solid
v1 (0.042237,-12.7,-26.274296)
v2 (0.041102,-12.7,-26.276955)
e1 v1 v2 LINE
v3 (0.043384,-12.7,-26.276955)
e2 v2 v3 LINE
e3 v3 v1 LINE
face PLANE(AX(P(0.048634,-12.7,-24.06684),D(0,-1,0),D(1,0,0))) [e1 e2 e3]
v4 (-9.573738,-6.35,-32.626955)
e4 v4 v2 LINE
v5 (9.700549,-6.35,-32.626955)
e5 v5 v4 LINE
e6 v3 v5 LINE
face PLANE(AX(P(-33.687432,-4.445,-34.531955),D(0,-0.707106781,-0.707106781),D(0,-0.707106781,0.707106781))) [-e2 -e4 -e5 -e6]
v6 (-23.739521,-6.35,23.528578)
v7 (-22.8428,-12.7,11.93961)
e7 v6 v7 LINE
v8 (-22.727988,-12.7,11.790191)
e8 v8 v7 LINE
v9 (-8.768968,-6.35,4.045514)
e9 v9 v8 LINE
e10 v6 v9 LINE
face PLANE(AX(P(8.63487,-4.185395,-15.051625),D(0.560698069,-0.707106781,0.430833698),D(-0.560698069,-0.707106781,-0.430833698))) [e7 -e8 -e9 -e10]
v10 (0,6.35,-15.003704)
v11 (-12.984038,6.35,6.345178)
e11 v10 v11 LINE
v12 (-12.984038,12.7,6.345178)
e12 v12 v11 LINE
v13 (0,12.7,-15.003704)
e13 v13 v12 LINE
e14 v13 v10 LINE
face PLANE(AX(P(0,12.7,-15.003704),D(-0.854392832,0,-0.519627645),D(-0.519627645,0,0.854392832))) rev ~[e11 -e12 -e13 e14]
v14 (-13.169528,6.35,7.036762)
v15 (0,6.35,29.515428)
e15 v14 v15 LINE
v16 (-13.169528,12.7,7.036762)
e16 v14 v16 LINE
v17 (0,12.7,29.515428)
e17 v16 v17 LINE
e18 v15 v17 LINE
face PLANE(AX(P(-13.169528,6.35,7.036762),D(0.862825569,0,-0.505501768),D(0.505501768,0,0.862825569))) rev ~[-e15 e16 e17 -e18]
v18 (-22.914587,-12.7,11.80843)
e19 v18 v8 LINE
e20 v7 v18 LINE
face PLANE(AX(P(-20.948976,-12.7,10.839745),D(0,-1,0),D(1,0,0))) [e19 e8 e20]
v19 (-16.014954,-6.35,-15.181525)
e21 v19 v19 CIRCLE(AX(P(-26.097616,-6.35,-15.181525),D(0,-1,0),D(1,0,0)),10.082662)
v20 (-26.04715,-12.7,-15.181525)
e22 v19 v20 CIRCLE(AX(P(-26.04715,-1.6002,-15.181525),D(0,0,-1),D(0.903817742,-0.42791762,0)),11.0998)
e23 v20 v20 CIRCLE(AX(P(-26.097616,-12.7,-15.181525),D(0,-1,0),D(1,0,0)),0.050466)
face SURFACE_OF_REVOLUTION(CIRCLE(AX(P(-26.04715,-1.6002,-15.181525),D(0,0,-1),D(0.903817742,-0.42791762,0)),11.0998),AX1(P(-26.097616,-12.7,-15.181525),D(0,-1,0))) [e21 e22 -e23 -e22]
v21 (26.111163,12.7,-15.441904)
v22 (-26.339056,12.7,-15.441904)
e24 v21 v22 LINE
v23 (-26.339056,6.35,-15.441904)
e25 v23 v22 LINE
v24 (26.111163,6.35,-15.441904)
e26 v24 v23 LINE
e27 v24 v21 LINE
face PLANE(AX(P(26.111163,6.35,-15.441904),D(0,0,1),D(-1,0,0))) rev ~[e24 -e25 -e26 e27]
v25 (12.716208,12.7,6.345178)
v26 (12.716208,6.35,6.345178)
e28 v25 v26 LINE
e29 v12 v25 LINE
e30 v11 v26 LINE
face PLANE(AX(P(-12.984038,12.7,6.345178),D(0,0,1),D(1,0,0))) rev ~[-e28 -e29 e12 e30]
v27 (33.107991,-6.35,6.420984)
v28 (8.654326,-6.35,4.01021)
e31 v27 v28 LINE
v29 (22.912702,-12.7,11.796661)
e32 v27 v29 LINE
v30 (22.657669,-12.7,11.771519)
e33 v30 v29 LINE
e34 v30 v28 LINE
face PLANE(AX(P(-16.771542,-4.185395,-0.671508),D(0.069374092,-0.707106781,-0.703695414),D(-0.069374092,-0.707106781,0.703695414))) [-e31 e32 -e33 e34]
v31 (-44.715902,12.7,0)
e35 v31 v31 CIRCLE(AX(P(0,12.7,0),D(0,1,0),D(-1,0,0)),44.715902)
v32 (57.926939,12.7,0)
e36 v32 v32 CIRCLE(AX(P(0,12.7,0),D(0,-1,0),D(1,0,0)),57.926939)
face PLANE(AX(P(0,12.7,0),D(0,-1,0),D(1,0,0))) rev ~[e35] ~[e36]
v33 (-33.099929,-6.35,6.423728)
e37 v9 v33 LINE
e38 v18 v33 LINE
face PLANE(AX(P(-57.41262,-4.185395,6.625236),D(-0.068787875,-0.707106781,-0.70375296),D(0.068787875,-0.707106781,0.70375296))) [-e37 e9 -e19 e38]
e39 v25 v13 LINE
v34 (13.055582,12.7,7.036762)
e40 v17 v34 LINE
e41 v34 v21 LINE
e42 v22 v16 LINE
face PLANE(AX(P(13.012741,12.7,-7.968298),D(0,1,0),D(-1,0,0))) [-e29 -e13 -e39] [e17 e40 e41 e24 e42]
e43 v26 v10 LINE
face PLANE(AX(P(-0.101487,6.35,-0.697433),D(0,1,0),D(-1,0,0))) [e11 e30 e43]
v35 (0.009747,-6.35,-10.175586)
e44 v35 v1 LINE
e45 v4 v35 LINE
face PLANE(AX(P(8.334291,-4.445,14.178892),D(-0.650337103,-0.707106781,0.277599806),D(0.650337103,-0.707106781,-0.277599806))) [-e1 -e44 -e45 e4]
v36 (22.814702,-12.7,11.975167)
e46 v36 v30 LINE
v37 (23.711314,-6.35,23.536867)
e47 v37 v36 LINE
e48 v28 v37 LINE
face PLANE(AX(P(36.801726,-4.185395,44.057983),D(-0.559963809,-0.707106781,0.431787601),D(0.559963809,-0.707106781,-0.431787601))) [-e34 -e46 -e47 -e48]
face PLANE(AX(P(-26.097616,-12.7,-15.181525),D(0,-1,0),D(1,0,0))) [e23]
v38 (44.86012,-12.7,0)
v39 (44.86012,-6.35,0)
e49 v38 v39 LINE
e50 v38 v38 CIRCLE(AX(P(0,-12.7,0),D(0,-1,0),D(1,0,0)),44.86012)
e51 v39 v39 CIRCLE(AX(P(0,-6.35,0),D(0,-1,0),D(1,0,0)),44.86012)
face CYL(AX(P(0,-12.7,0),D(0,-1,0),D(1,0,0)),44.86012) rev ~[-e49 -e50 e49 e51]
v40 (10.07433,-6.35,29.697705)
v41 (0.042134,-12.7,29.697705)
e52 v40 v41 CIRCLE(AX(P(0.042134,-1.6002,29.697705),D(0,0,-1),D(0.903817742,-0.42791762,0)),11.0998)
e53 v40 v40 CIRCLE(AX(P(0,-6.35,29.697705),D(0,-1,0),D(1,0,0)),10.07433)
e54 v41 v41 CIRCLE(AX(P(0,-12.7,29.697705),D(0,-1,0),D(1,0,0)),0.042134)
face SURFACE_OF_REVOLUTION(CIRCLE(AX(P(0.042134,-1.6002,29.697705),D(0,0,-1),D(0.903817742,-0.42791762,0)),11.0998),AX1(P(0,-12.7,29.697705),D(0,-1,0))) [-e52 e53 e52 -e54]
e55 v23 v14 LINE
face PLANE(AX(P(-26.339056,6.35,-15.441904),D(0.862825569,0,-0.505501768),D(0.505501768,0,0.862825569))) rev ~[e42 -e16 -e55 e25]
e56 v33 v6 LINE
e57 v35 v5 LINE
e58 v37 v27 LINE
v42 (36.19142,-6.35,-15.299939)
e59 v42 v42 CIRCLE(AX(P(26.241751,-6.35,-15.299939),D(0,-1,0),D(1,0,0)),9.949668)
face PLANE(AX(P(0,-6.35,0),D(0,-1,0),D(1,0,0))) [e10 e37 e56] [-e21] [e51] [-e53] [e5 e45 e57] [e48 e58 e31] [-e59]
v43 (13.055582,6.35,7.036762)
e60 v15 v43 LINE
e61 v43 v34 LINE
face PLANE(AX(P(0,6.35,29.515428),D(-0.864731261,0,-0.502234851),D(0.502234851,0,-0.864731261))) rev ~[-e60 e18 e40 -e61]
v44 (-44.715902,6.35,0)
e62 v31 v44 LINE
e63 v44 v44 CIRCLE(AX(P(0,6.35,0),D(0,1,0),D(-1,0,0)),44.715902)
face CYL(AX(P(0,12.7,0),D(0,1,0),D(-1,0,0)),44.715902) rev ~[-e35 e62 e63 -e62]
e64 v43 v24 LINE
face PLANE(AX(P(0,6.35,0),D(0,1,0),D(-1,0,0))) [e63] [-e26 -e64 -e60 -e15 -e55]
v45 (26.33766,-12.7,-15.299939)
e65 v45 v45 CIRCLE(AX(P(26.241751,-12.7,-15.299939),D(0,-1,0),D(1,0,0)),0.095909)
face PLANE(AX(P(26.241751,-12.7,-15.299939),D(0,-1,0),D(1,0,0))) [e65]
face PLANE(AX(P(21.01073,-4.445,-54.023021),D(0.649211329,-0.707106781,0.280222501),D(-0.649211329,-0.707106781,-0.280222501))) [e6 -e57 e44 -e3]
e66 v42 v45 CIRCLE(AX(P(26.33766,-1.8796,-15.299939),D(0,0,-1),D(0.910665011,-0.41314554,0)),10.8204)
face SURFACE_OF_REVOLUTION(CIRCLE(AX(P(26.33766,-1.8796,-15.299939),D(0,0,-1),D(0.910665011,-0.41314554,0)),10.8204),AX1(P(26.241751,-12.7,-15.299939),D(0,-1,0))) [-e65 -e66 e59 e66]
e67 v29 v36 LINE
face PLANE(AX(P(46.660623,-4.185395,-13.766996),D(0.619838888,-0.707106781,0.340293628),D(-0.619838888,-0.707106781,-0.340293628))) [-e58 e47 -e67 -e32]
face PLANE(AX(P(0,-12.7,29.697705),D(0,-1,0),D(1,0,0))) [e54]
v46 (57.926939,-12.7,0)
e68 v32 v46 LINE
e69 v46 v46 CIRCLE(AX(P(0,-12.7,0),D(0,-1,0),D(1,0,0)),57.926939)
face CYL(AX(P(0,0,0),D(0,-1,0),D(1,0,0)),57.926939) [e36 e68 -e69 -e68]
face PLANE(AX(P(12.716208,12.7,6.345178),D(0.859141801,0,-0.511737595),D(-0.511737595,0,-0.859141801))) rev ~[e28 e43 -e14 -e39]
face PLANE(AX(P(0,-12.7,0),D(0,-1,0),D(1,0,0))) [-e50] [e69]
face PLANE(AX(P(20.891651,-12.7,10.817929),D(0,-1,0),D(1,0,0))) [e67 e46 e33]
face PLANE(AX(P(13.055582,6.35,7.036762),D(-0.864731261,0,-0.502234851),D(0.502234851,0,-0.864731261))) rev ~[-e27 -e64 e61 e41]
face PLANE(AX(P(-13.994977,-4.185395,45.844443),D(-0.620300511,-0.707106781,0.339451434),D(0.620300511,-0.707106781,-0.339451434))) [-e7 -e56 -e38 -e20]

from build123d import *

# Parameters (mm, degrees)
F0_R          = 57.9269385224
F0_R_2        = 45.238930614
F0_R_3        = 10.232456426
F0_R_4        = 9.9260337363
F0_R_5        = 10.3400506536
F1_DEPTH      = 12.7
F2_DEPTH      = 12.7
F3_R          = 44.8601198224
F4_DEPTH      = 6.35
F5_R          = 44.7159015694
F6_DEPTH      = 6.35
F7_R          = 10.0743297083
F7_R_2        = 9.9496681994
F7_R_3        = 10.0826621072
F8_DEPTH      = 6.35
F13_DEPTH     = 6.35
F14_T4_DEPTH  = 74.4109063998
F14_T11_DEPTH = 74.5717160691
F14_T18_DEPTH = 67.9697661213
F14_T26_DEPTH = 74.4109063998
F14_T31_DEPTH = 67.9697661213
F14_T39_DEPTH = 74.4109063998
F14_T44_DEPTH = 74.5717160691
F14_T52_DEPTH = 74.5717160691
F14_T57_DEPTH = 67.9697661213
F15_T4_DEPTH  = 74.5533850225
F15_T11_DEPTH = 67.988668277
F15_T18_DEPTH = 74.6646190403
F15_T26_DEPTH = 74.5533850225
F15_T31_DEPTH = 74.6646190403
F15_T39_DEPTH = 74.5533850225
F15_T44_DEPTH = 67.988668277
F15_T52_DEPTH = 74.6646190403
F15_T57_DEPTH = 67.988668277
F16_T4_DEPTH  = 74.2472188603
F16_T10_DEPTH = 74.1921905859
F16_T16_DEPTH = 67.5143742402
F18_DEPTH     = 6.35
F20_DEPTH     = 6.35


# Not quite as in the source:
# - a fillet or chamfer that OpenCascade refuses, or shapes differently, is made with other operations: its cross-section is extruded or revolved along the edge and cut away or added


with BuildPart() as f1:
    # F0 (on Front) → F1 (new body)
    with BuildSketch(Plane.XZ):
        Circle(F0_R)
        Circle(F0_R_2, mode=Mode.SUBTRACT)
        Circle(F0_R_2)
        with Locations((-26.1295642704, -15.3669575229)):
            Circle(F0_R_3, mode=Mode.SUBTRACT)
        Polygon((-12.544834055, -34.5090515912), (0, -5.3877583705), (12.6424450427, -34.5090515912), align=None, mode=Mode.SUBTRACT)
        with Locations((26.1333119124, -15.1850637048)):
            Circle(F0_R_4, mode=Mode.SUBTRACT)
        Polygon((-36.0336452723, 4.8764180392), (-24.01153557, 26.9035063684), (-4.5260344632, 1.7700339667), align=None, mode=Mode.SUBTRACT)
        Polygon((36.1581519246, 4.842239432), (4.4649434276, 1.758374623), (24.0084677935, 26.875147596), align=None, mode=Mode.SUBTRACT)
        with Locations((0, 29.5979101211)):
            Circle(F0_R_5, mode=Mode.SUBTRACT)
        with Locations((0, 29.5979101211)):
            Circle(F0_R_5)
        Polygon((-4.5260344632, 1.7700339667), (-24.01153557, 26.9035063684), (-36.0336452723, 4.8764180392), align=None)
        with Locations((-26.1295642704, -15.3669575229)):
            Circle(F0_R_3)
        Polygon((12.6424450427, -34.5090515912), (0, -5.3877583705), (-12.544834055, -34.5090515912), align=None)
        with Locations((26.1333119124, -15.1850637048)):
            Circle(F0_R_4)
        Polygon((24.0084677935, 26.875147596), (4.4649434276, 1.758374623), (36.1581519246, 4.842239432), align=None)
    extrude(amount=F1_DEPTH)

    # F2 (add): a face of the model
    f2_faces = [f1.faces().sort_by_distance(p)[0] for p in [
        (0, 0, 0),
    ]]
    extrude(f2_faces, amount=F2_DEPTH)

    # F3 (on face) → F4 (cut)
    with BuildSketch(Plane.XZ.offset(12.7)):
        Circle(F3_R)
    extrude(amount=-F4_DEPTH, mode=Mode.SUBTRACT)

    # F5 (on face) → F6 (cut)
    with BuildSketch(Plane(origin=(0, 12.7, 0), x_dir=(-1, 0, 0), z_dir=(0, 1, 0))):
        Circle(F5_R)
    extrude(amount=-F6_DEPTH, mode=Mode.SUBTRACT)

    # F7 (on face) → F8 (join)
    with BuildSketch(Plane.XZ.offset(6.35)):
        with Locations((0, 29.6977050602)):
            Circle(F7_R)
        with Locations((26.2417513877, -15.2999386191)):
            Circle(F7_R_2)
        with Locations((-26.0976161808, -15.1815246791)):
            Circle(F7_R_3)
    extrude(amount=F8_DEPTH)

    # F9: fillet of radius 11.0998 on 1 edges, made by hand

    # F9_s1 → F9_t2 (revolve, cut)
    with BuildSketch(Plane.XY.offset(29.6977050602)):
        with BuildLine():
            ThreePointArc((10.0743297083, -6.35), (5.9786194513, -10.9790962592), (0.0421335379, -12.7))
            Line((0.0421335379, -12.7), (10.0743297083, -12.7))
            Line((10.0743297083, -12.7), (10.0743297083, -6.35))
        make_face()
    revolve(axis=Axis((0, -12.7, 29.6977050602), (0, -1, 0)), mode=Mode.SUBTRACT)

    # F10: fillet of radius 11.0998 on 1 edges, made by hand

    # F10_s1 → F10_t2 (revolve, cut)
    with BuildSketch(Plane.XY.offset(-15.1815246791)):
        with BuildLine():
            ThreePointArc((-16.0149540736, -6.35), (-20.1106643305, -10.9790962592), (-26.0471502439, -12.7))
            Line((-26.0471502439, -12.7), (-16.0149540736, -12.7))
            Line((-16.0149540736, -12.7), (-16.0149540736, -6.35))
        make_face()
    revolve(axis=Axis((-26.0976161808, -12.7, -15.1815246791), (0, -1, 0)), mode=Mode.SUBTRACT)

    # F11: fillet of radius 10.8204 on 1 edges, made by hand

    # F11_s1 → F11_t2 (revolve, cut)
    with BuildSketch(Plane.XY.offset(-15.2999386191)):
        with BuildLine():
            ThreePointArc((36.1914195871, -6.35), (32.1989541242, -10.9749991754), (26.3376598985, -12.7))
            Line((26.3376598985, -12.7), (36.1914195871, -12.7))
            Line((36.1914195871, -12.7), (36.1914195871, -6.35))
        make_face()
    revolve(axis=Axis((26.2417513877, -12.7, -15.2999386191), (0, -1, 0)), mode=Mode.SUBTRACT)

    # F12 (on face) → F13 (join)
    with BuildSketch(Plane.XZ.offset(6.35)):
        Polygon((-4.5254253782, 1.6911323182), (-24.0121241659, 27.0516239107), (-36.1962728202, 4.7867787071), align=None)
        Polygon((36.2073592842, 4.7867787071), (23.9838846028, 27.0516239107), (4.3973103166, 1.6507724067), align=None)
        Polygon((12.5976987183, -34.5319546759), (0, -5.3459731862), (-12.4581893906, -34.5319546759), align=None)
    extrude(amount=F13_DEPTH)

    # F14: chamfer of 8.2804 on 3 edges, made by hand


with BuildPart() as f14_tool2:
    # F14_s3 → F14_t4 (new body)
    with BuildSketch(Plane(origin=(-57.5107438509, 0, 5.6213502606), x_dir=(0, 1, 0), z_dir=(0.9952569801, 0, -0.0972807463))):
        with BuildLine():
            Line((-4.1853949204, 1.008669406), (-12.9342050796, 9.7574795653))
            Line((-12.9342050796, 9.7574795653), (-13.0998130796, 9.7574795653))
            ThreePointArc((-13.0998130796, 9.7574795653), (-12.865608, 5.5001770255), (-12.865608, 1.2428744857))
            Line((-12.865608, 1.2428744857), (-12.7, 1.0772664857))
            ThreePointArc((-12.7, 1.0772664857), (-8.4426974602, 1.0772664857), (-4.1853949204, 0.843061406))
            Line((-4.1853949204, 0.843061406), (-4.1853949204, 1.008669406))
        make_face()
    extrude(amount=F14_T4_DEPTH)

    split(bisect_by=Plane.XZ.offset(6.35), keep=Keep.TOP)

    split(bisect_by=Plane(origin=(-29.8705033929, 0, 16.3462467576), x_dir=(0, 1, 0), z_dir=(0.8772373953, 0, -0.4800568219)), keep=Keep.TOP)

    split(bisect_by=Plane(origin=(-2.0283818724, 0, -1.5585844001), x_dir=(0, 1, 0), z_dir=(-0.7929468135, 0, -0.6092908591)), keep=Keep.TOP)


with BuildPart() as f1_1:
    add(f1.part)

    # F14_t1: cut F14_tool2
    add(f14_tool2.part, mode=Mode.SUBTRACT)


with BuildPart() as f14_tool9:
    # F14_s10 → F14_t11 (new body)
    with BuildSketch(Plane(origin=(10.477539574, 0, -13.6357398024), x_dir=(0, 1, 0), z_dir=(-0.6092908591, 0, 0.7929468135))):
        with BuildLine():
            Line((-4.1853949204, 2.3238250907), (-12.9342050796, 11.07263525))
            Line((-12.9342050796, 11.07263525), (-13.0998130796, 11.07263525))
            ThreePointArc((-13.0998130796, 11.07263525), (-12.865608, 6.8153327102), (-12.865608, 2.5580301704))
            Line((-12.865608, 2.5580301704), (-12.7, 2.3924221704))
            ThreePointArc((-12.7, 2.3924221704), (-8.4426974602, 2.3924221704), (-4.1853949204, 2.1582170907))
            Line((-4.1853949204, 2.1582170907), (-4.1853949204, 2.3238250907))
        make_face()
    extrude(amount=F14_T11_DEPTH)

    split(bisect_by=Plane.XZ.offset(6.35), keep=Keep.TOP)

    split(bisect_by=Plane(origin=(0.1209077576, 0, 1.2369795072), x_dir=(0, 1, 0), z_dir=(0.0972807463, 0, 0.9952569801)), keep=Keep.TOP)

    split(bisect_by=Plane(origin=(-29.8705033929, 0, 16.3462467576), x_dir=(0, 1, 0), z_dir=(0.8772373953, 0, -0.4800568219)), keep=Keep.TOP)


with BuildPart() as f1_2:
    add(f1_1.part)

    # F14_t8: cut F14_tool9
    add(f14_tool9.part, mode=Mode.SUBTRACT)


with BuildPart() as f14_tool16:
    # F14_s17 → F14_t18 (new body)
    with BuildSketch(Plane(origin=(16.080979856, 0, 29.3857648468), x_dir=(0, 1, 0), z_dir=(-0.4800568219, 0, -0.8772373953))):
        with BuildLine():
            Line((-4.1853949204, -34.2848549414), (-12.9342050796, -25.5360447821))
            Line((-12.9342050796, -25.5360447821), (-13.0998130796, -25.5360447821))
            ThreePointArc((-13.0998130796, -25.5360447821), (-12.865608, -29.7933473219), (-12.865608, -34.0506498617))
            Line((-12.865608, -34.0506498617), (-12.7, -34.2162578617))
            ThreePointArc((-12.7, -34.2162578617), (-8.4426974602, -34.2162578617), (-4.1853949204, -34.4504629414))
            Line((-4.1853949204, -34.4504629414), (-4.1853949204, -34.2848549414))
        make_face()
    extrude(amount=F14_T18_DEPTH)

    split(bisect_by=Plane.XZ.offset(6.35), keep=Keep.TOP)

    split(bisect_by=Plane(origin=(0.1209077576, 0, 1.2369795072), x_dir=(0, 1, 0), z_dir=(0.0972807463, 0, 0.9952569801)), keep=Keep.TOP)

    split(bisect_by=Plane(origin=(-2.0283818724, 0, -1.5585844001), x_dir=(0, 1, 0), z_dir=(-0.7929468135, 0, -0.6092908591)), keep=Keep.TOP)


with BuildPart() as f1_3:
    add(f1_2.part)

    # F14_t15: cut F14_tool16
    add(f14_tool16.part, mode=Mode.SUBTRACT)


with BuildPart() as f14_tool24:
    # F14_s25 → F14_t26 (new body)
    with BuildSketch(Plane(origin=(-57.5107438509, 0, 5.6213502606), x_dir=(0, 1, 0), z_dir=(0.9952569801, 0, -0.0972807463))):
        with BuildLine():
            Line((-4.1853949204, 1.008669406), (-12.9342050796, 9.7574795653))
            Line((-12.9342050796, 9.7574795653), (-13.0998130796, 9.7574795653))
            ThreePointArc((-13.0998130796, 9.7574795653), (-12.865608, 5.5001770255), (-12.865608, 1.2428744857))
            Line((-12.865608, 1.2428744857), (-12.7, 1.0772664857))
            ThreePointArc((-12.7, 1.0772664857), (-8.4426974602, 1.0772664857), (-4.1853949204, 0.843061406))
            Line((-4.1853949204, 0.843061406), (-4.1853949204, 1.008669406))
        make_face()
    extrude(amount=F14_T26_DEPTH)

    split(bisect_by=Plane.XZ.offset(6.35), keep=Keep.TOP)

    split(bisect_by=Plane(origin=(-29.8705033929, 0, 16.3462467576), x_dir=(0, 1, 0), z_dir=(-0.8772373953, 0, 0.4800568219)), keep=Keep.TOP)


with BuildPart() as f14_tool29:
    # F14_s30 → F14_t31 (new body)
    with BuildSketch(Plane(origin=(16.080979856, 0, 29.3857648468), x_dir=(0, 1, 0), z_dir=(-0.4800568219, 0, -0.8772373953))):
        with BuildLine():
            Line((-4.1853949204, -34.2848549414), (-12.9342050796, -25.5360447821))
            Line((-12.9342050796, -25.5360447821), (-13.0998130796, -25.5360447821))
            ThreePointArc((-13.0998130796, -25.5360447821), (-12.865608, -29.7933473219), (-12.865608, -34.0506498617))
            Line((-12.865608, -34.0506498617), (-12.7, -34.2162578617))
            ThreePointArc((-12.7, -34.2162578617), (-8.4426974602, -34.2162578617), (-4.1853949204, -34.4504629414))
            Line((-4.1853949204, -34.4504629414), (-4.1853949204, -34.2848549414))
        make_face()
    extrude(amount=F14_T31_DEPTH)

    split(bisect_by=Plane.XZ.offset(6.35), keep=Keep.TOP)

    split(bisect_by=Plane(origin=(0.1209077576, 0, 1.2369795072), x_dir=(0, 1, 0), z_dir=(-0.0972807463, 0, -0.9952569801)), keep=Keep.TOP)


with BuildPart() as f14_tool24_1:
    add(f14_tool24.part)

    # F14_t34: intersect F14_tool29
    add(f14_tool29.part, mode=Mode.INTERSECT)


with BuildPart() as f1_4:
    add(f1_3.part)

    # F14_t22: cut F14_tool24
    add(f14_tool24_1.part, mode=Mode.SUBTRACT)


with BuildPart() as f14_tool37:
    # F14_s38 → F14_t39 (new body)
    with BuildSketch(Plane(origin=(-57.5107438509, 0, 5.6213502606), x_dir=(0, 1, 0), z_dir=(0.9952569801, 0, -0.0972807463))):
        with BuildLine():
            Line((-4.1853949204, 1.008669406), (-12.9342050796, 9.7574795653))
            Line((-12.9342050796, 9.7574795653), (-13.0998130796, 9.7574795653))
            ThreePointArc((-13.0998130796, 9.7574795653), (-12.865608, 5.5001770255), (-12.865608, 1.2428744857))
            Line((-12.865608, 1.2428744857), (-12.7, 1.0772664857))
            ThreePointArc((-12.7, 1.0772664857), (-8.4426974602, 1.0772664857), (-4.1853949204, 0.843061406))
            Line((-4.1853949204, 0.843061406), (-4.1853949204, 1.008669406))
        make_face()
    extrude(amount=F14_T39_DEPTH)

    split(bisect_by=Plane.XZ.offset(6.35), keep=Keep.TOP)

    split(bisect_by=Plane(origin=(-2.0283818724, 0, -1.5585844001), x_dir=(0, 1, 0), z_dir=(0.7929468135, 0, 0.6092908591)), keep=Keep.TOP)


with BuildPart() as f14_tool42:
    # F14_s43 → F14_t44 (new body)
    with BuildSketch(Plane(origin=(10.477539574, 0, -13.6357398024), x_dir=(0, 1, 0), z_dir=(-0.6092908591, 0, 0.7929468135))):
        with BuildLine():
            Line((-4.1853949204, 2.3238250907), (-12.9342050796, 11.07263525))
            Line((-12.9342050796, 11.07263525), (-13.0998130796, 11.07263525))
            ThreePointArc((-13.0998130796, 11.07263525), (-12.865608, 6.8153327102), (-12.865608, 2.5580301704))
            Line((-12.865608, 2.5580301704), (-12.7, 2.3924221704))
            ThreePointArc((-12.7, 2.3924221704), (-8.4426974602, 2.3924221704), (-4.1853949204, 2.1582170907))
            Line((-4.1853949204, 2.1582170907), (-4.1853949204, 2.3238250907))
        make_face()
    extrude(amount=F14_T44_DEPTH)

    split(bisect_by=Plane.XZ.offset(6.35), keep=Keep.TOP)

    split(bisect_by=Plane(origin=(0.1209077576, 0, 1.2369795072), x_dir=(0, 1, 0), z_dir=(-0.0972807463, 0, -0.9952569801)), keep=Keep.TOP)


with BuildPart() as f14_tool37_1:
    add(f14_tool37.part)

    # F14_t47: intersect F14_tool42
    add(f14_tool42.part, mode=Mode.INTERSECT)


with BuildPart() as f1_5:
    add(f1_4.part)

    # F14_t35: cut F14_tool37
    add(f14_tool37_1.part, mode=Mode.SUBTRACT)


with BuildPart() as f14_tool50:
    # F14_s51 → F14_t52 (new body)
    with BuildSketch(Plane(origin=(10.477539574, 0, -13.6357398024), x_dir=(0, 1, 0), z_dir=(-0.6092908591, 0, 0.7929468135))):
        with BuildLine():
            Line((-4.1853949204, 2.3238250907), (-12.9342050796, 11.07263525))
            Line((-12.9342050796, 11.07263525), (-13.0998130796, 11.07263525))
            ThreePointArc((-13.0998130796, 11.07263525), (-12.865608, 6.8153327102), (-12.865608, 2.5580301704))
            Line((-12.865608, 2.5580301704), (-12.7, 2.3924221704))
            ThreePointArc((-12.7, 2.3924221704), (-8.4426974602, 2.3924221704), (-4.1853949204, 2.1582170907))
            Line((-4.1853949204, 2.1582170907), (-4.1853949204, 2.3238250907))
        make_face()
    extrude(amount=F14_T52_DEPTH)

    split(bisect_by=Plane.XZ.offset(6.35), keep=Keep.TOP)

    split(bisect_by=Plane(origin=(-29.8705033929, 0, 16.3462467576), x_dir=(0, 1, 0), z_dir=(-0.8772373953, 0, 0.4800568219)), keep=Keep.TOP)


with BuildPart() as f14_tool55:
    # F14_s56 → F14_t57 (new body)
    with BuildSketch(Plane(origin=(16.080979856, 0, 29.3857648468), x_dir=(0, 1, 0), z_dir=(-0.4800568219, 0, -0.8772373953))):
        with BuildLine():
            Line((-4.1853949204, -34.2848549414), (-12.9342050796, -25.5360447821))
            Line((-12.9342050796, -25.5360447821), (-13.0998130796, -25.5360447821))
            ThreePointArc((-13.0998130796, -25.5360447821), (-12.865608, -29.7933473219), (-12.865608, -34.0506498617))
            Line((-12.865608, -34.0506498617), (-12.7, -34.2162578617))
            ThreePointArc((-12.7, -34.2162578617), (-8.4426974602, -34.2162578617), (-4.1853949204, -34.4504629414))
            Line((-4.1853949204, -34.4504629414), (-4.1853949204, -34.2848549414))
        make_face()
    extrude(amount=F14_T57_DEPTH)

    split(bisect_by=Plane.XZ.offset(6.35), keep=Keep.TOP)

    split(bisect_by=Plane(origin=(-2.0283818724, 0, -1.5585844001), x_dir=(0, 1, 0), z_dir=(0.7929468135, 0, 0.6092908591)), keep=Keep.TOP)


with BuildPart() as f14_tool50_1:
    add(f14_tool50.part)

    # F14_t60: intersect F14_tool55
    add(f14_tool55.part, mode=Mode.INTERSECT)


with BuildPart() as f1_6:
    add(f1_5.part)

    # F14_t48: cut F14_tool50
    add(f14_tool50_1.part, mode=Mode.SUBTRACT)

    # F15: chamfer of 8.2804 on 3 edges, made by hand


with BuildPart() as f15_tool2:
    # F15_s3 → F15_t4 (new body)
    with BuildSketch(Plane(origin=(-16.6756708248, 0, -1.6439776255), x_dir=(0, 1, 0), z_dir=(0.995175598, 0, 0.0981097812))):
        with BuildLine():
            Line((-4.1853949204, 0.9771841842), (-12.9342050796, 9.7259943435))
            Line((-12.9342050796, 9.7259943435), (-13.0998130796, 9.7259943435))
            ThreePointArc((-13.0998130796, 9.7259943435), (-12.865608, 5.4686918036), (-12.865608, 1.2113892638))
            Line((-12.865608, 1.2113892638), (-12.7, 1.0457812638))
            ThreePointArc((-12.7, 1.0457812638), (-8.4426974602, 1.0457812638), (-4.1853949204, 0.8115761842))
            Line((-4.1853949204, 0.8115761842), (-4.1853949204, 0.9771841842))
        make_face()
    extrude(amount=F15_T4_DEPTH)

    split(bisect_by=Plane.XZ.offset(6.35), keep=Keep.TOP)

    split(bisect_by=Plane(origin=(1.9593711293, 0, -1.510869357), x_dir=(0, 1, 0), z_dir=(0.7919084131, 0, -0.6106398818)), keep=Keep.TOP)

    split(bisect_by=Plane(origin=(29.8410766305, 0, 16.3828511415), x_dir=(0, 1, 0), z_dir=(-0.8765845615, 0, -0.4812478639)), keep=Keep.TOP)


with BuildPart() as f1_7:
    add(f1_6.part)

    # F15_t1: cut F15_tool2
    add(f15_tool2.part, mode=Mode.SUBTRACT)


with BuildPart() as f15_tool9:
    # F15_s10 → F15_t11 (new body)
    with BuildSketch(Plane(origin=(16.6142460012, 0, -30.2625583178), x_dir=(0, 1, 0), z_dir=(-0.4812478639, 0, 0.8765845615))):
        with BuildLine():
            Line((-4.1853949204, -34.2766442695), (-12.9342050796, -25.5278341102))
            Line((-12.9342050796, -25.5278341102), (-13.0998130796, -25.5278341102))
            ThreePointArc((-13.0998130796, -25.5278341102), (-12.865608, -29.78513665), (-12.865608, -34.0424391898))
            Line((-12.865608, -34.0424391898), (-12.7, -34.2080471898))
            ThreePointArc((-12.7, -34.2080471898), (-8.4426974602, -34.2080471898), (-4.1853949204, -34.4422522695))
            Line((-4.1853949204, -34.4422522695), (-4.1853949204, -34.2766442695))
        make_face()
    extrude(amount=F15_T11_DEPTH)

    split(bisect_by=Plane.XZ.offset(6.35), keep=Keep.TOP)

    split(bisect_by=Plane(origin=(-0.1188491357, 0, 1.205545035), x_dir=(0, 1, 0), z_dir=(-0.0981097812, 0, 0.995175598)), keep=Keep.TOP)

    split(bisect_by=Plane(origin=(1.9593711293, 0, -1.510869357), x_dir=(0, 1, 0), z_dir=(0.7919084131, 0, -0.6106398818)), keep=Keep.TOP)


with BuildPart() as f1_8:
    add(f1_7.part)

    # F15_t8: cut F15_tool9
    add(f15_tool9.part, mode=Mode.SUBTRACT)


with BuildPart() as f15_tool16:
    # F15_s17 → F15_t18 (new body)
    with BuildSketch(Plane(origin=(35.0278234042, 0, 45.4258375046), x_dir=(0, 1, 0), z_dir=(-0.6106398818, 0, -0.7919084131))):
        with BuildLine():
            Line((-4.1853949204, 2.2400344876), (-12.9342050796, 10.9888446469))
            Line((-12.9342050796, 10.9888446469), (-13.0998130796, 10.9888446469))
            ThreePointArc((-13.0998130796, 10.9888446469), (-12.865608, 6.7315421071), (-12.865608, 2.4742395673))
            Line((-12.865608, 2.4742395673), (-12.7, 2.3086315673))
            ThreePointArc((-12.7, 2.3086315673), (-8.4426974602, 2.3086315673), (-4.1853949204, 2.0744264876))
            Line((-4.1853949204, 2.0744264876), (-4.1853949204, 2.2400344876))
        make_face()
    extrude(amount=F15_T18_DEPTH)

    split(bisect_by=Plane.XZ.offset(6.35), keep=Keep.TOP)

    split(bisect_by=Plane(origin=(-0.1188491357, 0, 1.205545035), x_dir=(0, 1, 0), z_dir=(-0.0981097812, 0, 0.995175598)), keep=Keep.TOP)

    split(bisect_by=Plane(origin=(29.8410766305, 0, 16.3828511415), x_dir=(0, 1, 0), z_dir=(-0.8765845615, 0, -0.4812478639)), keep=Keep.TOP)


with BuildPart() as f1_9:
    add(f1_8.part)

    # F15_t15: cut F15_tool16
    add(f15_tool16.part, mode=Mode.SUBTRACT)


with BuildPart() as f15_tool24:
    # F15_s25 → F15_t26 (new body)
    with BuildSketch(Plane(origin=(-16.6756708248, 0, -1.6439776255), x_dir=(0, 1, 0), z_dir=(0.995175598, 0, 0.0981097812))):
        with BuildLine():
            Line((-4.1853949204, 0.9771841842), (-12.9342050796, 9.7259943435))
            Line((-12.9342050796, 9.7259943435), (-13.0998130796, 9.7259943435))
            ThreePointArc((-13.0998130796, 9.7259943435), (-12.865608, 5.4686918036), (-12.865608, 1.2113892638))
            Line((-12.865608, 1.2113892638), (-12.7, 1.0457812638))
            ThreePointArc((-12.7, 1.0457812638), (-8.4426974602, 1.0457812638), (-4.1853949204, 0.8115761842))
            Line((-4.1853949204, 0.8115761842), (-4.1853949204, 0.9771841842))
        make_face()
    extrude(amount=F15_T26_DEPTH)

    split(bisect_by=Plane.XZ.offset(6.35), keep=Keep.TOP)

    split(bisect_by=Plane(origin=(1.9593711293, 0, -1.510869357), x_dir=(0, 1, 0), z_dir=(-0.7919084131, 0, 0.6106398818)), keep=Keep.TOP)


with BuildPart() as f15_tool29:
    # F15_s30 → F15_t31 (new body)
    with BuildSketch(Plane(origin=(35.0278234042, 0, 45.4258375046), x_dir=(0, 1, 0), z_dir=(-0.6106398818, 0, -0.7919084131))):
        with BuildLine():
            Line((-4.1853949204, 2.2400344876), (-12.9342050796, 10.9888446469))
            Line((-12.9342050796, 10.9888446469), (-13.0998130796, 10.9888446469))
            ThreePointArc((-13.0998130796, 10.9888446469), (-12.865608, 6.7315421071), (-12.865608, 2.4742395673))
            Line((-12.865608, 2.4742395673), (-12.7, 2.3086315673))
            ThreePointArc((-12.7, 2.3086315673), (-8.4426974602, 2.3086315673), (-4.1853949204, 2.0744264876))
            Line((-4.1853949204, 2.0744264876), (-4.1853949204, 2.2400344876))
        make_face()
    extrude(amount=F15_T31_DEPTH)

    split(bisect_by=Plane.XZ.offset(6.35), keep=Keep.TOP)

    split(bisect_by=Plane(origin=(-0.1188491357, 0, 1.205545035), x_dir=(0, 1, 0), z_dir=(0.0981097812, 0, -0.995175598)), keep=Keep.TOP)


with BuildPart() as f15_tool24_1:
    add(f15_tool24.part)

    # F15_t34: intersect F15_tool29
    add(f15_tool29.part, mode=Mode.INTERSECT)


with BuildPart() as f1_10:
    add(f1_9.part)

    # F15_t22: cut F15_tool24
    add(f15_tool24_1.part, mode=Mode.SUBTRACT)


with BuildPart() as f15_tool37:
    # F15_s38 → F15_t39 (new body)
    with BuildSketch(Plane(origin=(-16.6756708248, 0, -1.6439776255), x_dir=(0, 1, 0), z_dir=(0.995175598, 0, 0.0981097812))):
        with BuildLine():
            Line((-4.1853949204, 0.9771841842), (-12.9342050796, 9.7259943435))
            Line((-12.9342050796, 9.7259943435), (-13.0998130796, 9.7259943435))
            ThreePointArc((-13.0998130796, 9.7259943435), (-12.865608, 5.4686918036), (-12.865608, 1.2113892638))
            Line((-12.865608, 1.2113892638), (-12.7, 1.0457812638))
            ThreePointArc((-12.7, 1.0457812638), (-8.4426974602, 1.0457812638), (-4.1853949204, 0.8115761842))
            Line((-4.1853949204, 0.8115761842), (-4.1853949204, 0.9771841842))
        make_face()
    extrude(amount=F15_T39_DEPTH)

    split(bisect_by=Plane.XZ.offset(6.35), keep=Keep.TOP)

    split(bisect_by=Plane(origin=(29.8410766305, 0, 16.3828511415), x_dir=(0, 1, 0), z_dir=(0.8765845615, 0, 0.4812478639)), keep=Keep.TOP)


with BuildPart() as f15_tool42:
    # F15_s43 → F15_t44 (new body)
    with BuildSketch(Plane(origin=(16.6142460012, 0, -30.2625583178), x_dir=(0, 1, 0), z_dir=(-0.4812478639, 0, 0.8765845615))):
        with BuildLine():
            Line((-4.1853949204, -34.2766442695), (-12.9342050796, -25.5278341102))
            Line((-12.9342050796, -25.5278341102), (-13.0998130796, -25.5278341102))
            ThreePointArc((-13.0998130796, -25.5278341102), (-12.865608, -29.78513665), (-12.865608, -34.0424391898))
            Line((-12.865608, -34.0424391898), (-12.7, -34.2080471898))
            ThreePointArc((-12.7, -34.2080471898), (-8.4426974602, -34.2080471898), (-4.1853949204, -34.4422522695))
            Line((-4.1853949204, -34.4422522695), (-4.1853949204, -34.2766442695))
        make_face()
    extrude(amount=F15_T44_DEPTH)

    split(bisect_by=Plane.XZ.offset(6.35), keep=Keep.TOP)

    split(bisect_by=Plane(origin=(-0.1188491357, 0, 1.205545035), x_dir=(0, 1, 0), z_dir=(0.0981097812, 0, -0.995175598)), keep=Keep.TOP)


with BuildPart() as f15_tool37_1:
    add(f15_tool37.part)

    # F15_t47: intersect F15_tool42
    add(f15_tool42.part, mode=Mode.INTERSECT)


with BuildPart() as f1_11:
    add(f1_10.part)

    # F15_t35: cut F15_tool37
    add(f15_tool37_1.part, mode=Mode.SUBTRACT)


with BuildPart() as f15_tool50:
    # F15_s51 → F15_t52 (new body)
    with BuildSketch(Plane(origin=(35.0278234042, 0, 45.4258375046), x_dir=(0, 1, 0), z_dir=(-0.6106398818, 0, -0.7919084131))):
        with BuildLine():
            Line((-4.1853949204, 2.2400344876), (-12.9342050796, 10.9888446469))
            Line((-12.9342050796, 10.9888446469), (-13.0998130796, 10.9888446469))
            ThreePointArc((-13.0998130796, 10.9888446469), (-12.865608, 6.7315421071), (-12.865608, 2.4742395673))
            Line((-12.865608, 2.4742395673), (-12.7, 2.3086315673))
            ThreePointArc((-12.7, 2.3086315673), (-8.4426974602, 2.3086315673), (-4.1853949204, 2.0744264876))
            Line((-4.1853949204, 2.0744264876), (-4.1853949204, 2.2400344876))
        make_face()
    extrude(amount=F15_T52_DEPTH)

    split(bisect_by=Plane.XZ.offset(6.35), keep=Keep.TOP)

    split(bisect_by=Plane(origin=(29.8410766305, 0, 16.3828511415), x_dir=(0, 1, 0), z_dir=(0.8765845615, 0, 0.4812478639)), keep=Keep.TOP)


with BuildPart() as f15_tool55:
    # F15_s56 → F15_t57 (new body)
    with BuildSketch(Plane(origin=(16.6142460012, 0, -30.2625583178), x_dir=(0, 1, 0), z_dir=(-0.4812478639, 0, 0.8765845615))):
        with BuildLine():
            Line((-4.1853949204, -34.2766442695), (-12.9342050796, -25.5278341102))
            Line((-12.9342050796, -25.5278341102), (-13.0998130796, -25.5278341102))
            ThreePointArc((-13.0998130796, -25.5278341102), (-12.865608, -29.78513665), (-12.865608, -34.0424391898))
            Line((-12.865608, -34.0424391898), (-12.7, -34.2080471898))
            ThreePointArc((-12.7, -34.2080471898), (-8.4426974602, -34.2080471898), (-4.1853949204, -34.4422522695))
            Line((-4.1853949204, -34.4422522695), (-4.1853949204, -34.2766442695))
        make_face()
    extrude(amount=F15_T57_DEPTH)

    split(bisect_by=Plane.XZ.offset(6.35), keep=Keep.TOP)

    split(bisect_by=Plane(origin=(1.9593711293, 0, -1.510869357), x_dir=(0, 1, 0), z_dir=(-0.7919084131, 0, 0.6106398818)), keep=Keep.TOP)


with BuildPart() as f15_tool50_1:
    add(f15_tool50.part)

    # F15_t60: intersect F15_tool55
    add(f15_tool55.part, mode=Mode.INTERSECT)


with BuildPart() as f1_12:
    add(f1_11.part)

    # F15_t48: cut F15_tool50
    add(f15_tool50_1.part, mode=Mode.SUBTRACT)

    # F16: chamfer of 8.255 on 3 edges, made by hand


with BuildPart() as f16_tool2:
    # F16_s3 → F16_t4 (new body)
    with BuildSketch(Plane(origin=(22.9558477812, 0, -53.1834395633), x_dir=(0, 1, 0), z_dir=(-0.3962944615, 0, 0.9181234665))):
        Polygon((-4.445, 2.118579565), (-12.7, 10.373579565), (-12.7, 2.118579565), align=None)
    extrude(amount=F16_T4_DEPTH)

    split(bisect_by=Plane.XZ.offset(6.35), keep=Keep.TOP)

    split(bisect_by=Plane.XY.offset(-34.5319546759), keep=Keep.TOP)


with BuildPart() as f1_13:
    add(f1_12.part)

    # F16_t1: cut F16_tool2
    add(f16_tool2.part, mode=Mode.SUBTRACT)


with BuildPart() as f16_tool8:
    # F16_s9 → F16_t10 (new body)
    with BuildSketch(Plane(origin=(6.4040370991, 0, 15.0028308588), x_dir=(0, 1, 0), z_dir=(-0.3925854105, 0, -0.9197155514))):
        Polygon((-4.445, 2.0987510779), (-12.7, 10.3537510779), (-12.7, 2.0987510779), align=None)
    extrude(amount=F16_T10_DEPTH)

    split(bisect_by=Plane.XZ.offset(6.35), keep=Keep.TOP)

    split(bisect_by=Plane.XY.offset(-34.5319546759), keep=Keep.TOP)


with BuildPart() as f1_14:
    add(f1_13.part)

    # F16_t7: cut F16_tool8
    add(f16_tool8.part, mode=Mode.SUBTRACT)


with BuildPart() as f16_tool14:
    # F16_s15 → F16_t16 (new body)
    with BuildSketch(Plane.YZ.offset(-33.6874324563)):
        Polygon((-4.445, -34.5319546759), (-12.7, -26.2769546759), (-12.7, -34.5319546759), align=None)
    extrude(amount=F16_T16_DEPTH)

    split(bisect_by=Plane.XZ.offset(6.35), keep=Keep.TOP)

    split(bisect_by=Plane(origin=(-1.9451176143, 0, -0.8395813478), x_dir=(0, 1, 0), z_dir=(-0.9181234665, 0, -0.3962944615)), keep=Keep.TOP)

    split(bisect_by=Plane(origin=(1.9302540048, 0, -0.8239390535), x_dir=(0, 1, 0), z_dir=(0.9197155514, 0, -0.3925854105)), keep=Keep.TOP)


with BuildPart() as f1_15:
    add(f1_14.part)

    # F16_t13: cut F16_tool14
    add(f16_tool14.part, mode=Mode.SUBTRACT)

    # F17 (on face) → F18 (join)
    with BuildSketch(Plane(origin=(0, 6.35, 0), x_dir=(-1, 0, 0), z_dir=(0, 1, 0))):
        Polygon((0.1139463857, -15.4419038445), (-13.0555815995, 7.0367623121), (-26.1111631989, -15.4419038445), align=None)
        Polygon((0.1139463857, -15.4419038445), (13.1695279852, 7.0367623121), (-13.0555815995, 7.0367623121), align=None)
        Polygon((13.1695279852, 7.0367623121), (0, 29.5154284686), (-13.0555815995, 7.0367623121), align=None)
        Polygon((26.3390559703, -15.4419038445), (13.1695279852, 7.0367623121), (0.1139463857, -15.4419038445), align=None)
    extrude(amount=F18_DEPTH)

    # F19 (on face) → F20 (cut)
    with BuildSketch(Plane(origin=(0, 12.7, 0), x_dir=(-1, 0, 0), z_dir=(0, 1, 0))):
        Polygon((12.9840383306, 6.3451784663), (-12.7162076533, 6.3451784663), (0, -15.0037035346), align=None)
    extrude(amount=-F20_DEPTH, mode=Mode.SUBTRACT)


solid = f1_15.part
